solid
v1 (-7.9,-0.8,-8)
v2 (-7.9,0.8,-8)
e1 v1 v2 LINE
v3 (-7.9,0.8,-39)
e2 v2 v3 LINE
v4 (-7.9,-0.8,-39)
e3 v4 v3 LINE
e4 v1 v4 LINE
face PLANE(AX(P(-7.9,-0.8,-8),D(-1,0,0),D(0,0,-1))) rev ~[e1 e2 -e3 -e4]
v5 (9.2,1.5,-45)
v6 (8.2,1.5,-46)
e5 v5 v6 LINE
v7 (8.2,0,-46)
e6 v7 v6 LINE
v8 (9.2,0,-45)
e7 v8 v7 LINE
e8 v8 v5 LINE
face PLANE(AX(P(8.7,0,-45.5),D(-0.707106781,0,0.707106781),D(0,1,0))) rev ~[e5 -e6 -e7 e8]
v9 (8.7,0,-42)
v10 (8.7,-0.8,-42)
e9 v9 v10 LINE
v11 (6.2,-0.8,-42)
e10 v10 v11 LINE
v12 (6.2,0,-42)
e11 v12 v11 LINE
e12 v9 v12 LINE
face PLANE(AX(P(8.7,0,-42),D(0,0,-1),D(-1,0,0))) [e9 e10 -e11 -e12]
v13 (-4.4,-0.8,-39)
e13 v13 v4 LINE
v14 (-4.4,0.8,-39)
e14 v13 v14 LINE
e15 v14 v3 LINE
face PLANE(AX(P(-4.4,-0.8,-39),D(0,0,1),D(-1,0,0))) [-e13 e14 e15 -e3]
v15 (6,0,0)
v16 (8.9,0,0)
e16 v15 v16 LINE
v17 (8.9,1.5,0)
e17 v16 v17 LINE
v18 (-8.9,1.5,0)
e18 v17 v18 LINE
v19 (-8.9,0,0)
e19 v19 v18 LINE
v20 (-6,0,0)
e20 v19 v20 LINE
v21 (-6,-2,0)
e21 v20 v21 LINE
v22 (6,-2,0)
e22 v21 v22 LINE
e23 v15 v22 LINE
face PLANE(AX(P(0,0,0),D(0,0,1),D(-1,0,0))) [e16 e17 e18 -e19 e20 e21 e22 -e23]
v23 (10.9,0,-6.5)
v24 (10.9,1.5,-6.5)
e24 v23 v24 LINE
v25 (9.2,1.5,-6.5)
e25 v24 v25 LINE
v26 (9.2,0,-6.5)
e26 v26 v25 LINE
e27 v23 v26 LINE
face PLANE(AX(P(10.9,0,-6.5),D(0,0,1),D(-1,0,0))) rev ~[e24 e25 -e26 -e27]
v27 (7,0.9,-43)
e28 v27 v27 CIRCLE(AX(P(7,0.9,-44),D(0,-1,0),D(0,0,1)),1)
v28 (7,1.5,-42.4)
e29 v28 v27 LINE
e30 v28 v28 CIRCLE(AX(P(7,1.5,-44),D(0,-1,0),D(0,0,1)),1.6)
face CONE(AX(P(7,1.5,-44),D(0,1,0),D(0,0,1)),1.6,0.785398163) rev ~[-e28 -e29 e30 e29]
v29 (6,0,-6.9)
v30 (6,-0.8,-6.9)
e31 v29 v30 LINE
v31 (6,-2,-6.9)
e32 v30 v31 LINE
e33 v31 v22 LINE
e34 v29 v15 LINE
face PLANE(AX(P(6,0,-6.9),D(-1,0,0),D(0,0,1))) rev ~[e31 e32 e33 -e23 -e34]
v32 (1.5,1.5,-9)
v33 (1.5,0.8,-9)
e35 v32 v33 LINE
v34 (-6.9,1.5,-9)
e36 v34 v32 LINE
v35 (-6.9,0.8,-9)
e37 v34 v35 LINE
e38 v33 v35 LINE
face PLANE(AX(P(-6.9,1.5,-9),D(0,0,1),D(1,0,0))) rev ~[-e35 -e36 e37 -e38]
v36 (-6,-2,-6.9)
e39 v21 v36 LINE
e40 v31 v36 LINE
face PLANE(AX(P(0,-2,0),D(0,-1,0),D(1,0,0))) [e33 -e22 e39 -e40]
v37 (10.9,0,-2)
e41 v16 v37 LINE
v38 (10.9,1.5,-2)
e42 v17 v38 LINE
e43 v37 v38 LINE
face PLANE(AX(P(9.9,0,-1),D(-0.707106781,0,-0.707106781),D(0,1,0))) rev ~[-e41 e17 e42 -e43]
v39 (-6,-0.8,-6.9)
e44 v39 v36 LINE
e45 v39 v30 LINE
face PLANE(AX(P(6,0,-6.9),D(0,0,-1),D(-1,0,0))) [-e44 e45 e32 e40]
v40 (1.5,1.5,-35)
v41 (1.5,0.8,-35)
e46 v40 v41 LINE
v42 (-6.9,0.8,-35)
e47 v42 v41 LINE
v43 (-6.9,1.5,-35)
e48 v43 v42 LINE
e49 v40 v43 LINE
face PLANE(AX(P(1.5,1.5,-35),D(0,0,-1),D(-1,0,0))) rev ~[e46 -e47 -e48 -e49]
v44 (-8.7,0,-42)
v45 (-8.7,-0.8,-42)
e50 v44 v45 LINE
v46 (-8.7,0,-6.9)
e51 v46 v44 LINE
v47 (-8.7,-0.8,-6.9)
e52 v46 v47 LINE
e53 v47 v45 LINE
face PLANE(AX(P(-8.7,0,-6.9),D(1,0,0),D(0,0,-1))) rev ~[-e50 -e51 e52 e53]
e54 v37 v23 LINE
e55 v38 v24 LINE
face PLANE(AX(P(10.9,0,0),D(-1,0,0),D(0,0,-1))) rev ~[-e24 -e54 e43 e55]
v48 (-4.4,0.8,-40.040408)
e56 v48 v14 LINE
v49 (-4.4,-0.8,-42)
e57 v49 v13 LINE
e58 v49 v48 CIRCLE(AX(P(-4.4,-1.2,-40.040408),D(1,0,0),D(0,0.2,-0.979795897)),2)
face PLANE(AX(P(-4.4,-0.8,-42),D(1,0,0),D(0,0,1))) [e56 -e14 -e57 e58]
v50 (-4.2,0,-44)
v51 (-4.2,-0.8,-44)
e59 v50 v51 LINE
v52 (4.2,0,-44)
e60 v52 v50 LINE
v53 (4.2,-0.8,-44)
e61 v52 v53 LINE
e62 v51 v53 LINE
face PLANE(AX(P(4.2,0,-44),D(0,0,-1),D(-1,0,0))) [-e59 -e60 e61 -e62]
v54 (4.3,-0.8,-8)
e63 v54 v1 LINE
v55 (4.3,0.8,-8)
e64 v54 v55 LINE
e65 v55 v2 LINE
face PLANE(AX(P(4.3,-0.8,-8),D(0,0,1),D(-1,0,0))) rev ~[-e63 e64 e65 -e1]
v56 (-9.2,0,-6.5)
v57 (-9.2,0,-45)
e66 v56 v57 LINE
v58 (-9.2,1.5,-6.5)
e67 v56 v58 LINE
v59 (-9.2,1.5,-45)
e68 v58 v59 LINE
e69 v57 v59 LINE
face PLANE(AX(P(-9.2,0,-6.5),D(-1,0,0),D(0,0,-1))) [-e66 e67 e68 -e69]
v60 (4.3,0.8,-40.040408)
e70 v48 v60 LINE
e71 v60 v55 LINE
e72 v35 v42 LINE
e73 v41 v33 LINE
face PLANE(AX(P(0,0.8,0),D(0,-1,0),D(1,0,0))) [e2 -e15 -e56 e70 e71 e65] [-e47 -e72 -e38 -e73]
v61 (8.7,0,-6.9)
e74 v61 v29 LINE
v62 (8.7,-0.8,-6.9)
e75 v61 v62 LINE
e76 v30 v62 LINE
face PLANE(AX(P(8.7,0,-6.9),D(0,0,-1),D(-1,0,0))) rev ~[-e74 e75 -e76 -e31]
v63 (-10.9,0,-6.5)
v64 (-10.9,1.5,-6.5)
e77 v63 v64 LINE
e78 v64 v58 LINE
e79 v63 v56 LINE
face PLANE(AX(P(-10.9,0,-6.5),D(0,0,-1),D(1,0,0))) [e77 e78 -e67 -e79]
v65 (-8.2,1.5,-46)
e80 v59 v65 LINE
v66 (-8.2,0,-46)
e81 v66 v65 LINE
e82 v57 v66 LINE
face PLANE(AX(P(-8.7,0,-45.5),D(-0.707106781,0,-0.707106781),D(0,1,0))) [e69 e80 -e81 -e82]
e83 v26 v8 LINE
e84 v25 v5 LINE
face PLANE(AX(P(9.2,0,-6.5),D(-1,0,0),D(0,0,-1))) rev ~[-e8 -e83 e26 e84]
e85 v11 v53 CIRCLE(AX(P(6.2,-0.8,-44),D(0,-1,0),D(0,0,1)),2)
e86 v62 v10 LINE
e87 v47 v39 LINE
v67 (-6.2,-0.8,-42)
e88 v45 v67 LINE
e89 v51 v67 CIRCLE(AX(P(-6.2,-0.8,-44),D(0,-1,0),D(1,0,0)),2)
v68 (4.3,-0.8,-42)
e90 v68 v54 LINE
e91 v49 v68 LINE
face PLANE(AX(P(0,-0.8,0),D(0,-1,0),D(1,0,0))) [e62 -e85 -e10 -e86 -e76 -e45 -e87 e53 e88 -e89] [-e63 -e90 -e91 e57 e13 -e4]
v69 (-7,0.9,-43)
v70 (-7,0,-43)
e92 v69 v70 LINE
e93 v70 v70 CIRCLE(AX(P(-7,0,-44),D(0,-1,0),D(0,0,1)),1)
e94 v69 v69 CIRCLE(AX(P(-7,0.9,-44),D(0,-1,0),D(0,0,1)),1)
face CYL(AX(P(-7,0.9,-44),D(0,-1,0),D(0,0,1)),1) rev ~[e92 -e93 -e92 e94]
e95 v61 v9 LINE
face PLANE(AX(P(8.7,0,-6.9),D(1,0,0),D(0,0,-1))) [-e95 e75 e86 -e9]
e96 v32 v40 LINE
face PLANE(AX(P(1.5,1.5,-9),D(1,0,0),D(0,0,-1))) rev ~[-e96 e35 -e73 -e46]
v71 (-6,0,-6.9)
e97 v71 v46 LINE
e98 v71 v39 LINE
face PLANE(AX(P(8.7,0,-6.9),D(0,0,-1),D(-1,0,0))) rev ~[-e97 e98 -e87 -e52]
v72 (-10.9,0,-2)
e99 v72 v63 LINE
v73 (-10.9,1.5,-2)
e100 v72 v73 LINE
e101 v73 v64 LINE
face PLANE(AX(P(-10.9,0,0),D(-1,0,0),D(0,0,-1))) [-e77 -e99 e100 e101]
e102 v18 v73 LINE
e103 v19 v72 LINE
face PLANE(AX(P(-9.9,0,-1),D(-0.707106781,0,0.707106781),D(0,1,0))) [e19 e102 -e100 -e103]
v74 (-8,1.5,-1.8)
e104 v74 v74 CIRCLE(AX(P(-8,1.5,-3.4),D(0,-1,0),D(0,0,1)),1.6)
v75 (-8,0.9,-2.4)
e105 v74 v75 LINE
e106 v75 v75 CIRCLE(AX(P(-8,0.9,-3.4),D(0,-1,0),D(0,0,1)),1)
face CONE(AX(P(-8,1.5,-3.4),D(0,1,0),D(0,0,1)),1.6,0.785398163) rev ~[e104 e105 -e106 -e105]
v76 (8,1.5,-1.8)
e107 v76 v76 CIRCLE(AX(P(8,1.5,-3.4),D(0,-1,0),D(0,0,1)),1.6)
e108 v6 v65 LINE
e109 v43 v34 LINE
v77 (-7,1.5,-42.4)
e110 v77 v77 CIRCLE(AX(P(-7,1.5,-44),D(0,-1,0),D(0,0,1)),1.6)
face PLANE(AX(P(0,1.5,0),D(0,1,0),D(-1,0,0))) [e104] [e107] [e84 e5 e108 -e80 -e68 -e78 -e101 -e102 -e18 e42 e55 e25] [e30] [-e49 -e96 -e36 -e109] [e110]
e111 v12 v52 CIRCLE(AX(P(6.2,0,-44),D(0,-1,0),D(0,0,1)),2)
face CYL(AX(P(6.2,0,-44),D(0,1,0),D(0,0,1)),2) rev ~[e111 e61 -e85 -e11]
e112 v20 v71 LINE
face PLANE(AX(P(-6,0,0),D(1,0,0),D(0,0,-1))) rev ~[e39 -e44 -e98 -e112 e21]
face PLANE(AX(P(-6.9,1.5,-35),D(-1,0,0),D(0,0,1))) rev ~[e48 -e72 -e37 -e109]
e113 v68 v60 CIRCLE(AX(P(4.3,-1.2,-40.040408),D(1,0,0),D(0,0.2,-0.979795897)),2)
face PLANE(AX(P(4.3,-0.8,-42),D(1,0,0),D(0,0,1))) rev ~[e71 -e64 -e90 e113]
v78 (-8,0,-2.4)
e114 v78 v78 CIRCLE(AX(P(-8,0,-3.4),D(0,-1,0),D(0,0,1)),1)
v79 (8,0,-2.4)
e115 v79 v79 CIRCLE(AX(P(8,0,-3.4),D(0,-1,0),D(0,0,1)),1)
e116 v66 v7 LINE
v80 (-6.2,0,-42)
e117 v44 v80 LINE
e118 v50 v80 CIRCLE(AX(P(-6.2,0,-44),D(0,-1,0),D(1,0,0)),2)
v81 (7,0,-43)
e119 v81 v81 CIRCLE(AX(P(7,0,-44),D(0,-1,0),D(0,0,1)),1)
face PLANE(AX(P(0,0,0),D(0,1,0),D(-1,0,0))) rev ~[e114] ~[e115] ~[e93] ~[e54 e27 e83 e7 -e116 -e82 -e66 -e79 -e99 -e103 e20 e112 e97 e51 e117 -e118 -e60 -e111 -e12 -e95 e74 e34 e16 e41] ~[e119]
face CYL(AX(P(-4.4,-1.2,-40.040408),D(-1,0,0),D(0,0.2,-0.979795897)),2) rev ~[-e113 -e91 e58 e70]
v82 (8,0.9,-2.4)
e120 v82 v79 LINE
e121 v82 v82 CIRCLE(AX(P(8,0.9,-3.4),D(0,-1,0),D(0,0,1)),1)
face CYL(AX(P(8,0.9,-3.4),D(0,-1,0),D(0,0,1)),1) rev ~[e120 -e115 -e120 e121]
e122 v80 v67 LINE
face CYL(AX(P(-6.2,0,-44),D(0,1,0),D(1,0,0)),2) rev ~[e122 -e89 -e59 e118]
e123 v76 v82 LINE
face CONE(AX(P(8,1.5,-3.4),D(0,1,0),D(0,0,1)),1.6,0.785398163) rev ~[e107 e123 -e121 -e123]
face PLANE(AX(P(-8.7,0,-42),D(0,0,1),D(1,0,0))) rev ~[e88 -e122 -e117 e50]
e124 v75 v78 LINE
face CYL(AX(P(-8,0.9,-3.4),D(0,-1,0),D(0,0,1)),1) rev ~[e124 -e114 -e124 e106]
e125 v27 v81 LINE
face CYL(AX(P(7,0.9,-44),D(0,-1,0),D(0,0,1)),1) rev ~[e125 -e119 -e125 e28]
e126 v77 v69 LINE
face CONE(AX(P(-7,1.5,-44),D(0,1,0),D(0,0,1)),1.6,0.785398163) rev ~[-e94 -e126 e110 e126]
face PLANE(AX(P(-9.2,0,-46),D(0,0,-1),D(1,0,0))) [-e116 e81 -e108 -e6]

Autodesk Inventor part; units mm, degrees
ref_plane "YZ Plane" through (0, 0, 0) normal (1, 0, 0) x (0, 1, 0)
ref_plane "XZ Plane" through (0, 0, 0) normal (0, 1, 0) x (-1, 0, 0)
ref_plane "XY Plane" through (0, 0, 0) normal (0, 0, 1) x (1, 0, 0)
sketch "Эскиз1" plane through (0, 0, 0) normal (0, 1, 0) x (-1, 0, 0)
  line L0 (0, 0) -> (0, -46)
  line L1 (0, 0) -> (10.9, 0)
  line L2 (10.9, 0) -> (10.9, -6.5)
  line L3 (10.9, -6.5) -> (9.2, -6.5)
  line L4 (9.2, -6.5) -> (9.2, -46)
  line L5 (9.2, -46) -> (0, -46)
  line L6 (0, 0) -> (-10.9, 0)
  line L7 (-10.9, 0) -> (-10.9, -6.5)
  line L8 (-10.9, -6.5) -> (-9.2, -6.5)
  line L9 (-9.2, -6.5) -> (-9.2, -46)
  line L10 (-9.2, -46) -> (0, -46)
  dimension "d1" = 6.5
  dimension "d2" = 46
  dimension "d3" = 18.4
  dimension "d4" = 21.8
extrude "Выдавливание1" add sketch "Эскиз1" along normal blind 1.5
chamfer "Фаска1" distance 2 angle 45 2 edges at (10.9, 0.75, 0) (-10.9, 0.75, 0)
chamfer "Фаска2" distance 1 angle 45 2 edges at (9.2, 0.75, -46) (-9.2, 0.75, -46)
sketch "Эскиз2" plane through (0, 1.5, 0) normal (0, 1, 0) x (1, 0, 0)
  line L0 (0, 0) -> (0, 46)
  line L1 (8.2, 46) -> (-8.2, 46) projected
  line L2 (-8.9, 0) -> (8.9, 0) projected
  point P0 (-8, 3.4)
  point P1 (8, 3.4)
  point P2 (-7, 44)
  point P3 (7, 44)
  dimension "d20" = 3.4
  dimension "d21" = 16
  dimension "d22" = 14
  dimension "d23" = 44
hole "Отверстие1" at (-8, 1.5, -3.4) at (8, 1.5, -3.4) at (-7, 1.5, -44) at (7, 1.5, -44) direction (0, -1, 0) diameter 2 end through all countersink diameter 3.2 countersink angle 90
sketch "Эскиз3" plane through (0, 0, 0) normal (0, -1, 0) x (1, 0, 0)
  line L0 (8.7, -6.9) -> (0, -6.9)
  line L1 (-8.9, 0) -> (8.9, 0) projected
  line L2 (8.7, -6.9) -> (8.7, -42)
  line L3 (10.9, -2) -> (10.9, -6.5) projected
  line L4 (8.7, -42) -> (6.2, -42)
  line L5 (4.2, -44) -> (4.2, -44)
  line L6 (4.2, -44) -> (0, -44)
  line L7 (8.7, -6.9) -> (5.8, -6.9)
  line L8 (0, 0) -> (0, -46)
  line L9 (8.2, -46) -> (-8.2, -46) projected
  arc A0 (6.2, -42) -> (4.2, -44) centre (6.2, -44) ccw
  line L10 (-8.7, -6.9) -> (0, -6.9)
  line L11 (-8.7, -6.9) -> (-8.7, -42)
  line L12 (-8.7, -42) -> (-6.2, -42)
  line L13 (-4.2, -44) -> (-4.2, -44)
  line L14 (-4.2, -44) -> (0, -44)
  line L15 (-8.7, -6.9) -> (-5.8, -6.9)
  arc A1 (-4.2, -44) -> (-6.2, -42) centre (-6.2, -44) ccw
  circle A2 centre (-7, -44) radius 1 projected
  circle A3 centre (-8, -3.4) radius 1 projected
  circle A4 centre (8, -3.4) radius 1 projected
  circle A5 centre (7, -44) radius 1 projected
  line L16 (-8.2, -46) -> (-9.2, -45) projected
  line L17 (8.2, -46) -> (-8.2, -46) projected
  line L18 (9.2, -45) -> (8.2, -46) projected
  line L19 (9.2, -6.5) -> (9.2, -45) projected
  line L20 (10.9, -6.5) -> (9.2, -6.5) projected
  line L21 (10.9, -2) -> (10.9, -6.5) projected
  line L22 (8.9, 0) -> (10.9, -2) projected
  line L23 (-8.9, 0) -> (8.9, 0) projected
  line L24 (-10.9, -2) -> (-8.9, 0) projected
  line L25 (-10.9, -6.5) -> (-10.9, -2) projected
  line L26 (-9.2, -6.5) -> (-10.9, -6.5) projected
  line L27 (-9.2, -45) -> (-9.2, -6.5) projected
  dimension "d24" = 6.9
  dimension "d25" = 2.2
  dimension "d26" = 42
  dimension "d27" = 44
  dimension "d28" = 6.7
  dimension "d30" = 2
extrude "Выдавливание2" add sketch "Эскиз3" along normal blind 0.8 contours L2 L4 A0 L6 L8 L0 | L8 L14 A1 L12 L11 L10
sketch "Эскиз5" plane through (0, -0.8, 0) normal (0, -1, 0) x (1, 0, 0)
  line L0 (-7.9, -42) -> (4.3, -42)
  line L1 (4.3, -42) -> (4.3, -8)
  line L2 (4.3, -8) -> (-7.9, -8)
  line L3 (-7.9, -8) -> (-7.9, -42)
  line L4 (-10.9, -6.5) -> (-10.9, -2) projected
  line L5 (9.2, -6.5) -> (9.2, -45) projected
  line L6 (-8.9, 0) -> (8.9, 0) projected
  line L7 (8.2, -46) -> (-8.2, -46) projected
  line L8 (-4.4, -42) -> (-4.4, -39)
  line L9 (-4.4, -39) -> (-7.9, -39)
  point P0 (0, 0)
  dimension "d33" = 3
  dimension "d35" = 8
  dimension "d36" = 4
  dimension "d40" = 31
  dimension "d41" = 3.5
  dimension "d55" = 12.2
extrude "Выдавливание3" cut sketch "Эскиз5" against normal blind 1.6 contours L8 L9 L3 L2 L1 L0
sketch "Эскиз6" plane through (0, 1.5, 0) normal (0, 1, 0) x (1, 0, 0)
  line L0 (-6.9, 9) -> (1.5, 9)
  line L1 (1.5, 9) -> (1.5, 35)
  line L2 (1.5, 35) -> (-6.9, 35)
  line L3 (-6.9, 35) -> (-6.9, 9)
  line L4 (-8.9, 0) -> (8.9, 0) projected
  line L5 (-9.2, 45) -> (-9.2, 6.5) projected
  line L6 (-10.9, 6.5) -> (-10.9, 2) projected
  line L7 (10.9, 2) -> (10.9, 6.5) projected
  point P0 (0, 0)
  dimension "d43" = 9
  dimension "d45" = 4
  dimension "d46" = 9.4
  dimension "d47" = 26
extrude "Выдавливание4" cut sketch "Эскиз6" against normal through all
fillet "Сопряжение2" radius 2 1 edges at (-0.05, 0.8, -42)
sketch "Эскиз7" plane through (0, 0, 0) normal (0, -1, 0) x (1, 0, 0)
  line L0 (-8.9, 0) -> (8.9, 0) projected
  line L1 (8.7, -6.9) -> (-8.7, -6.9) projected
  line L2 (6, 0) -> (-6, 0)
  line L3 (-6, 0) -> (-6, -6.9)
  line L4 (-6, -6.9) -> (6, -6.9)
  line L5 (6, -6.9) -> (6, 0)
  point P0 (0, 0)
  point P1 (0, 0)
  dimension "d51" = 12
extrude "Выдавливание5" add sketch "Эскиз7" along normal blind 2
properties part number "Case_top_new"
